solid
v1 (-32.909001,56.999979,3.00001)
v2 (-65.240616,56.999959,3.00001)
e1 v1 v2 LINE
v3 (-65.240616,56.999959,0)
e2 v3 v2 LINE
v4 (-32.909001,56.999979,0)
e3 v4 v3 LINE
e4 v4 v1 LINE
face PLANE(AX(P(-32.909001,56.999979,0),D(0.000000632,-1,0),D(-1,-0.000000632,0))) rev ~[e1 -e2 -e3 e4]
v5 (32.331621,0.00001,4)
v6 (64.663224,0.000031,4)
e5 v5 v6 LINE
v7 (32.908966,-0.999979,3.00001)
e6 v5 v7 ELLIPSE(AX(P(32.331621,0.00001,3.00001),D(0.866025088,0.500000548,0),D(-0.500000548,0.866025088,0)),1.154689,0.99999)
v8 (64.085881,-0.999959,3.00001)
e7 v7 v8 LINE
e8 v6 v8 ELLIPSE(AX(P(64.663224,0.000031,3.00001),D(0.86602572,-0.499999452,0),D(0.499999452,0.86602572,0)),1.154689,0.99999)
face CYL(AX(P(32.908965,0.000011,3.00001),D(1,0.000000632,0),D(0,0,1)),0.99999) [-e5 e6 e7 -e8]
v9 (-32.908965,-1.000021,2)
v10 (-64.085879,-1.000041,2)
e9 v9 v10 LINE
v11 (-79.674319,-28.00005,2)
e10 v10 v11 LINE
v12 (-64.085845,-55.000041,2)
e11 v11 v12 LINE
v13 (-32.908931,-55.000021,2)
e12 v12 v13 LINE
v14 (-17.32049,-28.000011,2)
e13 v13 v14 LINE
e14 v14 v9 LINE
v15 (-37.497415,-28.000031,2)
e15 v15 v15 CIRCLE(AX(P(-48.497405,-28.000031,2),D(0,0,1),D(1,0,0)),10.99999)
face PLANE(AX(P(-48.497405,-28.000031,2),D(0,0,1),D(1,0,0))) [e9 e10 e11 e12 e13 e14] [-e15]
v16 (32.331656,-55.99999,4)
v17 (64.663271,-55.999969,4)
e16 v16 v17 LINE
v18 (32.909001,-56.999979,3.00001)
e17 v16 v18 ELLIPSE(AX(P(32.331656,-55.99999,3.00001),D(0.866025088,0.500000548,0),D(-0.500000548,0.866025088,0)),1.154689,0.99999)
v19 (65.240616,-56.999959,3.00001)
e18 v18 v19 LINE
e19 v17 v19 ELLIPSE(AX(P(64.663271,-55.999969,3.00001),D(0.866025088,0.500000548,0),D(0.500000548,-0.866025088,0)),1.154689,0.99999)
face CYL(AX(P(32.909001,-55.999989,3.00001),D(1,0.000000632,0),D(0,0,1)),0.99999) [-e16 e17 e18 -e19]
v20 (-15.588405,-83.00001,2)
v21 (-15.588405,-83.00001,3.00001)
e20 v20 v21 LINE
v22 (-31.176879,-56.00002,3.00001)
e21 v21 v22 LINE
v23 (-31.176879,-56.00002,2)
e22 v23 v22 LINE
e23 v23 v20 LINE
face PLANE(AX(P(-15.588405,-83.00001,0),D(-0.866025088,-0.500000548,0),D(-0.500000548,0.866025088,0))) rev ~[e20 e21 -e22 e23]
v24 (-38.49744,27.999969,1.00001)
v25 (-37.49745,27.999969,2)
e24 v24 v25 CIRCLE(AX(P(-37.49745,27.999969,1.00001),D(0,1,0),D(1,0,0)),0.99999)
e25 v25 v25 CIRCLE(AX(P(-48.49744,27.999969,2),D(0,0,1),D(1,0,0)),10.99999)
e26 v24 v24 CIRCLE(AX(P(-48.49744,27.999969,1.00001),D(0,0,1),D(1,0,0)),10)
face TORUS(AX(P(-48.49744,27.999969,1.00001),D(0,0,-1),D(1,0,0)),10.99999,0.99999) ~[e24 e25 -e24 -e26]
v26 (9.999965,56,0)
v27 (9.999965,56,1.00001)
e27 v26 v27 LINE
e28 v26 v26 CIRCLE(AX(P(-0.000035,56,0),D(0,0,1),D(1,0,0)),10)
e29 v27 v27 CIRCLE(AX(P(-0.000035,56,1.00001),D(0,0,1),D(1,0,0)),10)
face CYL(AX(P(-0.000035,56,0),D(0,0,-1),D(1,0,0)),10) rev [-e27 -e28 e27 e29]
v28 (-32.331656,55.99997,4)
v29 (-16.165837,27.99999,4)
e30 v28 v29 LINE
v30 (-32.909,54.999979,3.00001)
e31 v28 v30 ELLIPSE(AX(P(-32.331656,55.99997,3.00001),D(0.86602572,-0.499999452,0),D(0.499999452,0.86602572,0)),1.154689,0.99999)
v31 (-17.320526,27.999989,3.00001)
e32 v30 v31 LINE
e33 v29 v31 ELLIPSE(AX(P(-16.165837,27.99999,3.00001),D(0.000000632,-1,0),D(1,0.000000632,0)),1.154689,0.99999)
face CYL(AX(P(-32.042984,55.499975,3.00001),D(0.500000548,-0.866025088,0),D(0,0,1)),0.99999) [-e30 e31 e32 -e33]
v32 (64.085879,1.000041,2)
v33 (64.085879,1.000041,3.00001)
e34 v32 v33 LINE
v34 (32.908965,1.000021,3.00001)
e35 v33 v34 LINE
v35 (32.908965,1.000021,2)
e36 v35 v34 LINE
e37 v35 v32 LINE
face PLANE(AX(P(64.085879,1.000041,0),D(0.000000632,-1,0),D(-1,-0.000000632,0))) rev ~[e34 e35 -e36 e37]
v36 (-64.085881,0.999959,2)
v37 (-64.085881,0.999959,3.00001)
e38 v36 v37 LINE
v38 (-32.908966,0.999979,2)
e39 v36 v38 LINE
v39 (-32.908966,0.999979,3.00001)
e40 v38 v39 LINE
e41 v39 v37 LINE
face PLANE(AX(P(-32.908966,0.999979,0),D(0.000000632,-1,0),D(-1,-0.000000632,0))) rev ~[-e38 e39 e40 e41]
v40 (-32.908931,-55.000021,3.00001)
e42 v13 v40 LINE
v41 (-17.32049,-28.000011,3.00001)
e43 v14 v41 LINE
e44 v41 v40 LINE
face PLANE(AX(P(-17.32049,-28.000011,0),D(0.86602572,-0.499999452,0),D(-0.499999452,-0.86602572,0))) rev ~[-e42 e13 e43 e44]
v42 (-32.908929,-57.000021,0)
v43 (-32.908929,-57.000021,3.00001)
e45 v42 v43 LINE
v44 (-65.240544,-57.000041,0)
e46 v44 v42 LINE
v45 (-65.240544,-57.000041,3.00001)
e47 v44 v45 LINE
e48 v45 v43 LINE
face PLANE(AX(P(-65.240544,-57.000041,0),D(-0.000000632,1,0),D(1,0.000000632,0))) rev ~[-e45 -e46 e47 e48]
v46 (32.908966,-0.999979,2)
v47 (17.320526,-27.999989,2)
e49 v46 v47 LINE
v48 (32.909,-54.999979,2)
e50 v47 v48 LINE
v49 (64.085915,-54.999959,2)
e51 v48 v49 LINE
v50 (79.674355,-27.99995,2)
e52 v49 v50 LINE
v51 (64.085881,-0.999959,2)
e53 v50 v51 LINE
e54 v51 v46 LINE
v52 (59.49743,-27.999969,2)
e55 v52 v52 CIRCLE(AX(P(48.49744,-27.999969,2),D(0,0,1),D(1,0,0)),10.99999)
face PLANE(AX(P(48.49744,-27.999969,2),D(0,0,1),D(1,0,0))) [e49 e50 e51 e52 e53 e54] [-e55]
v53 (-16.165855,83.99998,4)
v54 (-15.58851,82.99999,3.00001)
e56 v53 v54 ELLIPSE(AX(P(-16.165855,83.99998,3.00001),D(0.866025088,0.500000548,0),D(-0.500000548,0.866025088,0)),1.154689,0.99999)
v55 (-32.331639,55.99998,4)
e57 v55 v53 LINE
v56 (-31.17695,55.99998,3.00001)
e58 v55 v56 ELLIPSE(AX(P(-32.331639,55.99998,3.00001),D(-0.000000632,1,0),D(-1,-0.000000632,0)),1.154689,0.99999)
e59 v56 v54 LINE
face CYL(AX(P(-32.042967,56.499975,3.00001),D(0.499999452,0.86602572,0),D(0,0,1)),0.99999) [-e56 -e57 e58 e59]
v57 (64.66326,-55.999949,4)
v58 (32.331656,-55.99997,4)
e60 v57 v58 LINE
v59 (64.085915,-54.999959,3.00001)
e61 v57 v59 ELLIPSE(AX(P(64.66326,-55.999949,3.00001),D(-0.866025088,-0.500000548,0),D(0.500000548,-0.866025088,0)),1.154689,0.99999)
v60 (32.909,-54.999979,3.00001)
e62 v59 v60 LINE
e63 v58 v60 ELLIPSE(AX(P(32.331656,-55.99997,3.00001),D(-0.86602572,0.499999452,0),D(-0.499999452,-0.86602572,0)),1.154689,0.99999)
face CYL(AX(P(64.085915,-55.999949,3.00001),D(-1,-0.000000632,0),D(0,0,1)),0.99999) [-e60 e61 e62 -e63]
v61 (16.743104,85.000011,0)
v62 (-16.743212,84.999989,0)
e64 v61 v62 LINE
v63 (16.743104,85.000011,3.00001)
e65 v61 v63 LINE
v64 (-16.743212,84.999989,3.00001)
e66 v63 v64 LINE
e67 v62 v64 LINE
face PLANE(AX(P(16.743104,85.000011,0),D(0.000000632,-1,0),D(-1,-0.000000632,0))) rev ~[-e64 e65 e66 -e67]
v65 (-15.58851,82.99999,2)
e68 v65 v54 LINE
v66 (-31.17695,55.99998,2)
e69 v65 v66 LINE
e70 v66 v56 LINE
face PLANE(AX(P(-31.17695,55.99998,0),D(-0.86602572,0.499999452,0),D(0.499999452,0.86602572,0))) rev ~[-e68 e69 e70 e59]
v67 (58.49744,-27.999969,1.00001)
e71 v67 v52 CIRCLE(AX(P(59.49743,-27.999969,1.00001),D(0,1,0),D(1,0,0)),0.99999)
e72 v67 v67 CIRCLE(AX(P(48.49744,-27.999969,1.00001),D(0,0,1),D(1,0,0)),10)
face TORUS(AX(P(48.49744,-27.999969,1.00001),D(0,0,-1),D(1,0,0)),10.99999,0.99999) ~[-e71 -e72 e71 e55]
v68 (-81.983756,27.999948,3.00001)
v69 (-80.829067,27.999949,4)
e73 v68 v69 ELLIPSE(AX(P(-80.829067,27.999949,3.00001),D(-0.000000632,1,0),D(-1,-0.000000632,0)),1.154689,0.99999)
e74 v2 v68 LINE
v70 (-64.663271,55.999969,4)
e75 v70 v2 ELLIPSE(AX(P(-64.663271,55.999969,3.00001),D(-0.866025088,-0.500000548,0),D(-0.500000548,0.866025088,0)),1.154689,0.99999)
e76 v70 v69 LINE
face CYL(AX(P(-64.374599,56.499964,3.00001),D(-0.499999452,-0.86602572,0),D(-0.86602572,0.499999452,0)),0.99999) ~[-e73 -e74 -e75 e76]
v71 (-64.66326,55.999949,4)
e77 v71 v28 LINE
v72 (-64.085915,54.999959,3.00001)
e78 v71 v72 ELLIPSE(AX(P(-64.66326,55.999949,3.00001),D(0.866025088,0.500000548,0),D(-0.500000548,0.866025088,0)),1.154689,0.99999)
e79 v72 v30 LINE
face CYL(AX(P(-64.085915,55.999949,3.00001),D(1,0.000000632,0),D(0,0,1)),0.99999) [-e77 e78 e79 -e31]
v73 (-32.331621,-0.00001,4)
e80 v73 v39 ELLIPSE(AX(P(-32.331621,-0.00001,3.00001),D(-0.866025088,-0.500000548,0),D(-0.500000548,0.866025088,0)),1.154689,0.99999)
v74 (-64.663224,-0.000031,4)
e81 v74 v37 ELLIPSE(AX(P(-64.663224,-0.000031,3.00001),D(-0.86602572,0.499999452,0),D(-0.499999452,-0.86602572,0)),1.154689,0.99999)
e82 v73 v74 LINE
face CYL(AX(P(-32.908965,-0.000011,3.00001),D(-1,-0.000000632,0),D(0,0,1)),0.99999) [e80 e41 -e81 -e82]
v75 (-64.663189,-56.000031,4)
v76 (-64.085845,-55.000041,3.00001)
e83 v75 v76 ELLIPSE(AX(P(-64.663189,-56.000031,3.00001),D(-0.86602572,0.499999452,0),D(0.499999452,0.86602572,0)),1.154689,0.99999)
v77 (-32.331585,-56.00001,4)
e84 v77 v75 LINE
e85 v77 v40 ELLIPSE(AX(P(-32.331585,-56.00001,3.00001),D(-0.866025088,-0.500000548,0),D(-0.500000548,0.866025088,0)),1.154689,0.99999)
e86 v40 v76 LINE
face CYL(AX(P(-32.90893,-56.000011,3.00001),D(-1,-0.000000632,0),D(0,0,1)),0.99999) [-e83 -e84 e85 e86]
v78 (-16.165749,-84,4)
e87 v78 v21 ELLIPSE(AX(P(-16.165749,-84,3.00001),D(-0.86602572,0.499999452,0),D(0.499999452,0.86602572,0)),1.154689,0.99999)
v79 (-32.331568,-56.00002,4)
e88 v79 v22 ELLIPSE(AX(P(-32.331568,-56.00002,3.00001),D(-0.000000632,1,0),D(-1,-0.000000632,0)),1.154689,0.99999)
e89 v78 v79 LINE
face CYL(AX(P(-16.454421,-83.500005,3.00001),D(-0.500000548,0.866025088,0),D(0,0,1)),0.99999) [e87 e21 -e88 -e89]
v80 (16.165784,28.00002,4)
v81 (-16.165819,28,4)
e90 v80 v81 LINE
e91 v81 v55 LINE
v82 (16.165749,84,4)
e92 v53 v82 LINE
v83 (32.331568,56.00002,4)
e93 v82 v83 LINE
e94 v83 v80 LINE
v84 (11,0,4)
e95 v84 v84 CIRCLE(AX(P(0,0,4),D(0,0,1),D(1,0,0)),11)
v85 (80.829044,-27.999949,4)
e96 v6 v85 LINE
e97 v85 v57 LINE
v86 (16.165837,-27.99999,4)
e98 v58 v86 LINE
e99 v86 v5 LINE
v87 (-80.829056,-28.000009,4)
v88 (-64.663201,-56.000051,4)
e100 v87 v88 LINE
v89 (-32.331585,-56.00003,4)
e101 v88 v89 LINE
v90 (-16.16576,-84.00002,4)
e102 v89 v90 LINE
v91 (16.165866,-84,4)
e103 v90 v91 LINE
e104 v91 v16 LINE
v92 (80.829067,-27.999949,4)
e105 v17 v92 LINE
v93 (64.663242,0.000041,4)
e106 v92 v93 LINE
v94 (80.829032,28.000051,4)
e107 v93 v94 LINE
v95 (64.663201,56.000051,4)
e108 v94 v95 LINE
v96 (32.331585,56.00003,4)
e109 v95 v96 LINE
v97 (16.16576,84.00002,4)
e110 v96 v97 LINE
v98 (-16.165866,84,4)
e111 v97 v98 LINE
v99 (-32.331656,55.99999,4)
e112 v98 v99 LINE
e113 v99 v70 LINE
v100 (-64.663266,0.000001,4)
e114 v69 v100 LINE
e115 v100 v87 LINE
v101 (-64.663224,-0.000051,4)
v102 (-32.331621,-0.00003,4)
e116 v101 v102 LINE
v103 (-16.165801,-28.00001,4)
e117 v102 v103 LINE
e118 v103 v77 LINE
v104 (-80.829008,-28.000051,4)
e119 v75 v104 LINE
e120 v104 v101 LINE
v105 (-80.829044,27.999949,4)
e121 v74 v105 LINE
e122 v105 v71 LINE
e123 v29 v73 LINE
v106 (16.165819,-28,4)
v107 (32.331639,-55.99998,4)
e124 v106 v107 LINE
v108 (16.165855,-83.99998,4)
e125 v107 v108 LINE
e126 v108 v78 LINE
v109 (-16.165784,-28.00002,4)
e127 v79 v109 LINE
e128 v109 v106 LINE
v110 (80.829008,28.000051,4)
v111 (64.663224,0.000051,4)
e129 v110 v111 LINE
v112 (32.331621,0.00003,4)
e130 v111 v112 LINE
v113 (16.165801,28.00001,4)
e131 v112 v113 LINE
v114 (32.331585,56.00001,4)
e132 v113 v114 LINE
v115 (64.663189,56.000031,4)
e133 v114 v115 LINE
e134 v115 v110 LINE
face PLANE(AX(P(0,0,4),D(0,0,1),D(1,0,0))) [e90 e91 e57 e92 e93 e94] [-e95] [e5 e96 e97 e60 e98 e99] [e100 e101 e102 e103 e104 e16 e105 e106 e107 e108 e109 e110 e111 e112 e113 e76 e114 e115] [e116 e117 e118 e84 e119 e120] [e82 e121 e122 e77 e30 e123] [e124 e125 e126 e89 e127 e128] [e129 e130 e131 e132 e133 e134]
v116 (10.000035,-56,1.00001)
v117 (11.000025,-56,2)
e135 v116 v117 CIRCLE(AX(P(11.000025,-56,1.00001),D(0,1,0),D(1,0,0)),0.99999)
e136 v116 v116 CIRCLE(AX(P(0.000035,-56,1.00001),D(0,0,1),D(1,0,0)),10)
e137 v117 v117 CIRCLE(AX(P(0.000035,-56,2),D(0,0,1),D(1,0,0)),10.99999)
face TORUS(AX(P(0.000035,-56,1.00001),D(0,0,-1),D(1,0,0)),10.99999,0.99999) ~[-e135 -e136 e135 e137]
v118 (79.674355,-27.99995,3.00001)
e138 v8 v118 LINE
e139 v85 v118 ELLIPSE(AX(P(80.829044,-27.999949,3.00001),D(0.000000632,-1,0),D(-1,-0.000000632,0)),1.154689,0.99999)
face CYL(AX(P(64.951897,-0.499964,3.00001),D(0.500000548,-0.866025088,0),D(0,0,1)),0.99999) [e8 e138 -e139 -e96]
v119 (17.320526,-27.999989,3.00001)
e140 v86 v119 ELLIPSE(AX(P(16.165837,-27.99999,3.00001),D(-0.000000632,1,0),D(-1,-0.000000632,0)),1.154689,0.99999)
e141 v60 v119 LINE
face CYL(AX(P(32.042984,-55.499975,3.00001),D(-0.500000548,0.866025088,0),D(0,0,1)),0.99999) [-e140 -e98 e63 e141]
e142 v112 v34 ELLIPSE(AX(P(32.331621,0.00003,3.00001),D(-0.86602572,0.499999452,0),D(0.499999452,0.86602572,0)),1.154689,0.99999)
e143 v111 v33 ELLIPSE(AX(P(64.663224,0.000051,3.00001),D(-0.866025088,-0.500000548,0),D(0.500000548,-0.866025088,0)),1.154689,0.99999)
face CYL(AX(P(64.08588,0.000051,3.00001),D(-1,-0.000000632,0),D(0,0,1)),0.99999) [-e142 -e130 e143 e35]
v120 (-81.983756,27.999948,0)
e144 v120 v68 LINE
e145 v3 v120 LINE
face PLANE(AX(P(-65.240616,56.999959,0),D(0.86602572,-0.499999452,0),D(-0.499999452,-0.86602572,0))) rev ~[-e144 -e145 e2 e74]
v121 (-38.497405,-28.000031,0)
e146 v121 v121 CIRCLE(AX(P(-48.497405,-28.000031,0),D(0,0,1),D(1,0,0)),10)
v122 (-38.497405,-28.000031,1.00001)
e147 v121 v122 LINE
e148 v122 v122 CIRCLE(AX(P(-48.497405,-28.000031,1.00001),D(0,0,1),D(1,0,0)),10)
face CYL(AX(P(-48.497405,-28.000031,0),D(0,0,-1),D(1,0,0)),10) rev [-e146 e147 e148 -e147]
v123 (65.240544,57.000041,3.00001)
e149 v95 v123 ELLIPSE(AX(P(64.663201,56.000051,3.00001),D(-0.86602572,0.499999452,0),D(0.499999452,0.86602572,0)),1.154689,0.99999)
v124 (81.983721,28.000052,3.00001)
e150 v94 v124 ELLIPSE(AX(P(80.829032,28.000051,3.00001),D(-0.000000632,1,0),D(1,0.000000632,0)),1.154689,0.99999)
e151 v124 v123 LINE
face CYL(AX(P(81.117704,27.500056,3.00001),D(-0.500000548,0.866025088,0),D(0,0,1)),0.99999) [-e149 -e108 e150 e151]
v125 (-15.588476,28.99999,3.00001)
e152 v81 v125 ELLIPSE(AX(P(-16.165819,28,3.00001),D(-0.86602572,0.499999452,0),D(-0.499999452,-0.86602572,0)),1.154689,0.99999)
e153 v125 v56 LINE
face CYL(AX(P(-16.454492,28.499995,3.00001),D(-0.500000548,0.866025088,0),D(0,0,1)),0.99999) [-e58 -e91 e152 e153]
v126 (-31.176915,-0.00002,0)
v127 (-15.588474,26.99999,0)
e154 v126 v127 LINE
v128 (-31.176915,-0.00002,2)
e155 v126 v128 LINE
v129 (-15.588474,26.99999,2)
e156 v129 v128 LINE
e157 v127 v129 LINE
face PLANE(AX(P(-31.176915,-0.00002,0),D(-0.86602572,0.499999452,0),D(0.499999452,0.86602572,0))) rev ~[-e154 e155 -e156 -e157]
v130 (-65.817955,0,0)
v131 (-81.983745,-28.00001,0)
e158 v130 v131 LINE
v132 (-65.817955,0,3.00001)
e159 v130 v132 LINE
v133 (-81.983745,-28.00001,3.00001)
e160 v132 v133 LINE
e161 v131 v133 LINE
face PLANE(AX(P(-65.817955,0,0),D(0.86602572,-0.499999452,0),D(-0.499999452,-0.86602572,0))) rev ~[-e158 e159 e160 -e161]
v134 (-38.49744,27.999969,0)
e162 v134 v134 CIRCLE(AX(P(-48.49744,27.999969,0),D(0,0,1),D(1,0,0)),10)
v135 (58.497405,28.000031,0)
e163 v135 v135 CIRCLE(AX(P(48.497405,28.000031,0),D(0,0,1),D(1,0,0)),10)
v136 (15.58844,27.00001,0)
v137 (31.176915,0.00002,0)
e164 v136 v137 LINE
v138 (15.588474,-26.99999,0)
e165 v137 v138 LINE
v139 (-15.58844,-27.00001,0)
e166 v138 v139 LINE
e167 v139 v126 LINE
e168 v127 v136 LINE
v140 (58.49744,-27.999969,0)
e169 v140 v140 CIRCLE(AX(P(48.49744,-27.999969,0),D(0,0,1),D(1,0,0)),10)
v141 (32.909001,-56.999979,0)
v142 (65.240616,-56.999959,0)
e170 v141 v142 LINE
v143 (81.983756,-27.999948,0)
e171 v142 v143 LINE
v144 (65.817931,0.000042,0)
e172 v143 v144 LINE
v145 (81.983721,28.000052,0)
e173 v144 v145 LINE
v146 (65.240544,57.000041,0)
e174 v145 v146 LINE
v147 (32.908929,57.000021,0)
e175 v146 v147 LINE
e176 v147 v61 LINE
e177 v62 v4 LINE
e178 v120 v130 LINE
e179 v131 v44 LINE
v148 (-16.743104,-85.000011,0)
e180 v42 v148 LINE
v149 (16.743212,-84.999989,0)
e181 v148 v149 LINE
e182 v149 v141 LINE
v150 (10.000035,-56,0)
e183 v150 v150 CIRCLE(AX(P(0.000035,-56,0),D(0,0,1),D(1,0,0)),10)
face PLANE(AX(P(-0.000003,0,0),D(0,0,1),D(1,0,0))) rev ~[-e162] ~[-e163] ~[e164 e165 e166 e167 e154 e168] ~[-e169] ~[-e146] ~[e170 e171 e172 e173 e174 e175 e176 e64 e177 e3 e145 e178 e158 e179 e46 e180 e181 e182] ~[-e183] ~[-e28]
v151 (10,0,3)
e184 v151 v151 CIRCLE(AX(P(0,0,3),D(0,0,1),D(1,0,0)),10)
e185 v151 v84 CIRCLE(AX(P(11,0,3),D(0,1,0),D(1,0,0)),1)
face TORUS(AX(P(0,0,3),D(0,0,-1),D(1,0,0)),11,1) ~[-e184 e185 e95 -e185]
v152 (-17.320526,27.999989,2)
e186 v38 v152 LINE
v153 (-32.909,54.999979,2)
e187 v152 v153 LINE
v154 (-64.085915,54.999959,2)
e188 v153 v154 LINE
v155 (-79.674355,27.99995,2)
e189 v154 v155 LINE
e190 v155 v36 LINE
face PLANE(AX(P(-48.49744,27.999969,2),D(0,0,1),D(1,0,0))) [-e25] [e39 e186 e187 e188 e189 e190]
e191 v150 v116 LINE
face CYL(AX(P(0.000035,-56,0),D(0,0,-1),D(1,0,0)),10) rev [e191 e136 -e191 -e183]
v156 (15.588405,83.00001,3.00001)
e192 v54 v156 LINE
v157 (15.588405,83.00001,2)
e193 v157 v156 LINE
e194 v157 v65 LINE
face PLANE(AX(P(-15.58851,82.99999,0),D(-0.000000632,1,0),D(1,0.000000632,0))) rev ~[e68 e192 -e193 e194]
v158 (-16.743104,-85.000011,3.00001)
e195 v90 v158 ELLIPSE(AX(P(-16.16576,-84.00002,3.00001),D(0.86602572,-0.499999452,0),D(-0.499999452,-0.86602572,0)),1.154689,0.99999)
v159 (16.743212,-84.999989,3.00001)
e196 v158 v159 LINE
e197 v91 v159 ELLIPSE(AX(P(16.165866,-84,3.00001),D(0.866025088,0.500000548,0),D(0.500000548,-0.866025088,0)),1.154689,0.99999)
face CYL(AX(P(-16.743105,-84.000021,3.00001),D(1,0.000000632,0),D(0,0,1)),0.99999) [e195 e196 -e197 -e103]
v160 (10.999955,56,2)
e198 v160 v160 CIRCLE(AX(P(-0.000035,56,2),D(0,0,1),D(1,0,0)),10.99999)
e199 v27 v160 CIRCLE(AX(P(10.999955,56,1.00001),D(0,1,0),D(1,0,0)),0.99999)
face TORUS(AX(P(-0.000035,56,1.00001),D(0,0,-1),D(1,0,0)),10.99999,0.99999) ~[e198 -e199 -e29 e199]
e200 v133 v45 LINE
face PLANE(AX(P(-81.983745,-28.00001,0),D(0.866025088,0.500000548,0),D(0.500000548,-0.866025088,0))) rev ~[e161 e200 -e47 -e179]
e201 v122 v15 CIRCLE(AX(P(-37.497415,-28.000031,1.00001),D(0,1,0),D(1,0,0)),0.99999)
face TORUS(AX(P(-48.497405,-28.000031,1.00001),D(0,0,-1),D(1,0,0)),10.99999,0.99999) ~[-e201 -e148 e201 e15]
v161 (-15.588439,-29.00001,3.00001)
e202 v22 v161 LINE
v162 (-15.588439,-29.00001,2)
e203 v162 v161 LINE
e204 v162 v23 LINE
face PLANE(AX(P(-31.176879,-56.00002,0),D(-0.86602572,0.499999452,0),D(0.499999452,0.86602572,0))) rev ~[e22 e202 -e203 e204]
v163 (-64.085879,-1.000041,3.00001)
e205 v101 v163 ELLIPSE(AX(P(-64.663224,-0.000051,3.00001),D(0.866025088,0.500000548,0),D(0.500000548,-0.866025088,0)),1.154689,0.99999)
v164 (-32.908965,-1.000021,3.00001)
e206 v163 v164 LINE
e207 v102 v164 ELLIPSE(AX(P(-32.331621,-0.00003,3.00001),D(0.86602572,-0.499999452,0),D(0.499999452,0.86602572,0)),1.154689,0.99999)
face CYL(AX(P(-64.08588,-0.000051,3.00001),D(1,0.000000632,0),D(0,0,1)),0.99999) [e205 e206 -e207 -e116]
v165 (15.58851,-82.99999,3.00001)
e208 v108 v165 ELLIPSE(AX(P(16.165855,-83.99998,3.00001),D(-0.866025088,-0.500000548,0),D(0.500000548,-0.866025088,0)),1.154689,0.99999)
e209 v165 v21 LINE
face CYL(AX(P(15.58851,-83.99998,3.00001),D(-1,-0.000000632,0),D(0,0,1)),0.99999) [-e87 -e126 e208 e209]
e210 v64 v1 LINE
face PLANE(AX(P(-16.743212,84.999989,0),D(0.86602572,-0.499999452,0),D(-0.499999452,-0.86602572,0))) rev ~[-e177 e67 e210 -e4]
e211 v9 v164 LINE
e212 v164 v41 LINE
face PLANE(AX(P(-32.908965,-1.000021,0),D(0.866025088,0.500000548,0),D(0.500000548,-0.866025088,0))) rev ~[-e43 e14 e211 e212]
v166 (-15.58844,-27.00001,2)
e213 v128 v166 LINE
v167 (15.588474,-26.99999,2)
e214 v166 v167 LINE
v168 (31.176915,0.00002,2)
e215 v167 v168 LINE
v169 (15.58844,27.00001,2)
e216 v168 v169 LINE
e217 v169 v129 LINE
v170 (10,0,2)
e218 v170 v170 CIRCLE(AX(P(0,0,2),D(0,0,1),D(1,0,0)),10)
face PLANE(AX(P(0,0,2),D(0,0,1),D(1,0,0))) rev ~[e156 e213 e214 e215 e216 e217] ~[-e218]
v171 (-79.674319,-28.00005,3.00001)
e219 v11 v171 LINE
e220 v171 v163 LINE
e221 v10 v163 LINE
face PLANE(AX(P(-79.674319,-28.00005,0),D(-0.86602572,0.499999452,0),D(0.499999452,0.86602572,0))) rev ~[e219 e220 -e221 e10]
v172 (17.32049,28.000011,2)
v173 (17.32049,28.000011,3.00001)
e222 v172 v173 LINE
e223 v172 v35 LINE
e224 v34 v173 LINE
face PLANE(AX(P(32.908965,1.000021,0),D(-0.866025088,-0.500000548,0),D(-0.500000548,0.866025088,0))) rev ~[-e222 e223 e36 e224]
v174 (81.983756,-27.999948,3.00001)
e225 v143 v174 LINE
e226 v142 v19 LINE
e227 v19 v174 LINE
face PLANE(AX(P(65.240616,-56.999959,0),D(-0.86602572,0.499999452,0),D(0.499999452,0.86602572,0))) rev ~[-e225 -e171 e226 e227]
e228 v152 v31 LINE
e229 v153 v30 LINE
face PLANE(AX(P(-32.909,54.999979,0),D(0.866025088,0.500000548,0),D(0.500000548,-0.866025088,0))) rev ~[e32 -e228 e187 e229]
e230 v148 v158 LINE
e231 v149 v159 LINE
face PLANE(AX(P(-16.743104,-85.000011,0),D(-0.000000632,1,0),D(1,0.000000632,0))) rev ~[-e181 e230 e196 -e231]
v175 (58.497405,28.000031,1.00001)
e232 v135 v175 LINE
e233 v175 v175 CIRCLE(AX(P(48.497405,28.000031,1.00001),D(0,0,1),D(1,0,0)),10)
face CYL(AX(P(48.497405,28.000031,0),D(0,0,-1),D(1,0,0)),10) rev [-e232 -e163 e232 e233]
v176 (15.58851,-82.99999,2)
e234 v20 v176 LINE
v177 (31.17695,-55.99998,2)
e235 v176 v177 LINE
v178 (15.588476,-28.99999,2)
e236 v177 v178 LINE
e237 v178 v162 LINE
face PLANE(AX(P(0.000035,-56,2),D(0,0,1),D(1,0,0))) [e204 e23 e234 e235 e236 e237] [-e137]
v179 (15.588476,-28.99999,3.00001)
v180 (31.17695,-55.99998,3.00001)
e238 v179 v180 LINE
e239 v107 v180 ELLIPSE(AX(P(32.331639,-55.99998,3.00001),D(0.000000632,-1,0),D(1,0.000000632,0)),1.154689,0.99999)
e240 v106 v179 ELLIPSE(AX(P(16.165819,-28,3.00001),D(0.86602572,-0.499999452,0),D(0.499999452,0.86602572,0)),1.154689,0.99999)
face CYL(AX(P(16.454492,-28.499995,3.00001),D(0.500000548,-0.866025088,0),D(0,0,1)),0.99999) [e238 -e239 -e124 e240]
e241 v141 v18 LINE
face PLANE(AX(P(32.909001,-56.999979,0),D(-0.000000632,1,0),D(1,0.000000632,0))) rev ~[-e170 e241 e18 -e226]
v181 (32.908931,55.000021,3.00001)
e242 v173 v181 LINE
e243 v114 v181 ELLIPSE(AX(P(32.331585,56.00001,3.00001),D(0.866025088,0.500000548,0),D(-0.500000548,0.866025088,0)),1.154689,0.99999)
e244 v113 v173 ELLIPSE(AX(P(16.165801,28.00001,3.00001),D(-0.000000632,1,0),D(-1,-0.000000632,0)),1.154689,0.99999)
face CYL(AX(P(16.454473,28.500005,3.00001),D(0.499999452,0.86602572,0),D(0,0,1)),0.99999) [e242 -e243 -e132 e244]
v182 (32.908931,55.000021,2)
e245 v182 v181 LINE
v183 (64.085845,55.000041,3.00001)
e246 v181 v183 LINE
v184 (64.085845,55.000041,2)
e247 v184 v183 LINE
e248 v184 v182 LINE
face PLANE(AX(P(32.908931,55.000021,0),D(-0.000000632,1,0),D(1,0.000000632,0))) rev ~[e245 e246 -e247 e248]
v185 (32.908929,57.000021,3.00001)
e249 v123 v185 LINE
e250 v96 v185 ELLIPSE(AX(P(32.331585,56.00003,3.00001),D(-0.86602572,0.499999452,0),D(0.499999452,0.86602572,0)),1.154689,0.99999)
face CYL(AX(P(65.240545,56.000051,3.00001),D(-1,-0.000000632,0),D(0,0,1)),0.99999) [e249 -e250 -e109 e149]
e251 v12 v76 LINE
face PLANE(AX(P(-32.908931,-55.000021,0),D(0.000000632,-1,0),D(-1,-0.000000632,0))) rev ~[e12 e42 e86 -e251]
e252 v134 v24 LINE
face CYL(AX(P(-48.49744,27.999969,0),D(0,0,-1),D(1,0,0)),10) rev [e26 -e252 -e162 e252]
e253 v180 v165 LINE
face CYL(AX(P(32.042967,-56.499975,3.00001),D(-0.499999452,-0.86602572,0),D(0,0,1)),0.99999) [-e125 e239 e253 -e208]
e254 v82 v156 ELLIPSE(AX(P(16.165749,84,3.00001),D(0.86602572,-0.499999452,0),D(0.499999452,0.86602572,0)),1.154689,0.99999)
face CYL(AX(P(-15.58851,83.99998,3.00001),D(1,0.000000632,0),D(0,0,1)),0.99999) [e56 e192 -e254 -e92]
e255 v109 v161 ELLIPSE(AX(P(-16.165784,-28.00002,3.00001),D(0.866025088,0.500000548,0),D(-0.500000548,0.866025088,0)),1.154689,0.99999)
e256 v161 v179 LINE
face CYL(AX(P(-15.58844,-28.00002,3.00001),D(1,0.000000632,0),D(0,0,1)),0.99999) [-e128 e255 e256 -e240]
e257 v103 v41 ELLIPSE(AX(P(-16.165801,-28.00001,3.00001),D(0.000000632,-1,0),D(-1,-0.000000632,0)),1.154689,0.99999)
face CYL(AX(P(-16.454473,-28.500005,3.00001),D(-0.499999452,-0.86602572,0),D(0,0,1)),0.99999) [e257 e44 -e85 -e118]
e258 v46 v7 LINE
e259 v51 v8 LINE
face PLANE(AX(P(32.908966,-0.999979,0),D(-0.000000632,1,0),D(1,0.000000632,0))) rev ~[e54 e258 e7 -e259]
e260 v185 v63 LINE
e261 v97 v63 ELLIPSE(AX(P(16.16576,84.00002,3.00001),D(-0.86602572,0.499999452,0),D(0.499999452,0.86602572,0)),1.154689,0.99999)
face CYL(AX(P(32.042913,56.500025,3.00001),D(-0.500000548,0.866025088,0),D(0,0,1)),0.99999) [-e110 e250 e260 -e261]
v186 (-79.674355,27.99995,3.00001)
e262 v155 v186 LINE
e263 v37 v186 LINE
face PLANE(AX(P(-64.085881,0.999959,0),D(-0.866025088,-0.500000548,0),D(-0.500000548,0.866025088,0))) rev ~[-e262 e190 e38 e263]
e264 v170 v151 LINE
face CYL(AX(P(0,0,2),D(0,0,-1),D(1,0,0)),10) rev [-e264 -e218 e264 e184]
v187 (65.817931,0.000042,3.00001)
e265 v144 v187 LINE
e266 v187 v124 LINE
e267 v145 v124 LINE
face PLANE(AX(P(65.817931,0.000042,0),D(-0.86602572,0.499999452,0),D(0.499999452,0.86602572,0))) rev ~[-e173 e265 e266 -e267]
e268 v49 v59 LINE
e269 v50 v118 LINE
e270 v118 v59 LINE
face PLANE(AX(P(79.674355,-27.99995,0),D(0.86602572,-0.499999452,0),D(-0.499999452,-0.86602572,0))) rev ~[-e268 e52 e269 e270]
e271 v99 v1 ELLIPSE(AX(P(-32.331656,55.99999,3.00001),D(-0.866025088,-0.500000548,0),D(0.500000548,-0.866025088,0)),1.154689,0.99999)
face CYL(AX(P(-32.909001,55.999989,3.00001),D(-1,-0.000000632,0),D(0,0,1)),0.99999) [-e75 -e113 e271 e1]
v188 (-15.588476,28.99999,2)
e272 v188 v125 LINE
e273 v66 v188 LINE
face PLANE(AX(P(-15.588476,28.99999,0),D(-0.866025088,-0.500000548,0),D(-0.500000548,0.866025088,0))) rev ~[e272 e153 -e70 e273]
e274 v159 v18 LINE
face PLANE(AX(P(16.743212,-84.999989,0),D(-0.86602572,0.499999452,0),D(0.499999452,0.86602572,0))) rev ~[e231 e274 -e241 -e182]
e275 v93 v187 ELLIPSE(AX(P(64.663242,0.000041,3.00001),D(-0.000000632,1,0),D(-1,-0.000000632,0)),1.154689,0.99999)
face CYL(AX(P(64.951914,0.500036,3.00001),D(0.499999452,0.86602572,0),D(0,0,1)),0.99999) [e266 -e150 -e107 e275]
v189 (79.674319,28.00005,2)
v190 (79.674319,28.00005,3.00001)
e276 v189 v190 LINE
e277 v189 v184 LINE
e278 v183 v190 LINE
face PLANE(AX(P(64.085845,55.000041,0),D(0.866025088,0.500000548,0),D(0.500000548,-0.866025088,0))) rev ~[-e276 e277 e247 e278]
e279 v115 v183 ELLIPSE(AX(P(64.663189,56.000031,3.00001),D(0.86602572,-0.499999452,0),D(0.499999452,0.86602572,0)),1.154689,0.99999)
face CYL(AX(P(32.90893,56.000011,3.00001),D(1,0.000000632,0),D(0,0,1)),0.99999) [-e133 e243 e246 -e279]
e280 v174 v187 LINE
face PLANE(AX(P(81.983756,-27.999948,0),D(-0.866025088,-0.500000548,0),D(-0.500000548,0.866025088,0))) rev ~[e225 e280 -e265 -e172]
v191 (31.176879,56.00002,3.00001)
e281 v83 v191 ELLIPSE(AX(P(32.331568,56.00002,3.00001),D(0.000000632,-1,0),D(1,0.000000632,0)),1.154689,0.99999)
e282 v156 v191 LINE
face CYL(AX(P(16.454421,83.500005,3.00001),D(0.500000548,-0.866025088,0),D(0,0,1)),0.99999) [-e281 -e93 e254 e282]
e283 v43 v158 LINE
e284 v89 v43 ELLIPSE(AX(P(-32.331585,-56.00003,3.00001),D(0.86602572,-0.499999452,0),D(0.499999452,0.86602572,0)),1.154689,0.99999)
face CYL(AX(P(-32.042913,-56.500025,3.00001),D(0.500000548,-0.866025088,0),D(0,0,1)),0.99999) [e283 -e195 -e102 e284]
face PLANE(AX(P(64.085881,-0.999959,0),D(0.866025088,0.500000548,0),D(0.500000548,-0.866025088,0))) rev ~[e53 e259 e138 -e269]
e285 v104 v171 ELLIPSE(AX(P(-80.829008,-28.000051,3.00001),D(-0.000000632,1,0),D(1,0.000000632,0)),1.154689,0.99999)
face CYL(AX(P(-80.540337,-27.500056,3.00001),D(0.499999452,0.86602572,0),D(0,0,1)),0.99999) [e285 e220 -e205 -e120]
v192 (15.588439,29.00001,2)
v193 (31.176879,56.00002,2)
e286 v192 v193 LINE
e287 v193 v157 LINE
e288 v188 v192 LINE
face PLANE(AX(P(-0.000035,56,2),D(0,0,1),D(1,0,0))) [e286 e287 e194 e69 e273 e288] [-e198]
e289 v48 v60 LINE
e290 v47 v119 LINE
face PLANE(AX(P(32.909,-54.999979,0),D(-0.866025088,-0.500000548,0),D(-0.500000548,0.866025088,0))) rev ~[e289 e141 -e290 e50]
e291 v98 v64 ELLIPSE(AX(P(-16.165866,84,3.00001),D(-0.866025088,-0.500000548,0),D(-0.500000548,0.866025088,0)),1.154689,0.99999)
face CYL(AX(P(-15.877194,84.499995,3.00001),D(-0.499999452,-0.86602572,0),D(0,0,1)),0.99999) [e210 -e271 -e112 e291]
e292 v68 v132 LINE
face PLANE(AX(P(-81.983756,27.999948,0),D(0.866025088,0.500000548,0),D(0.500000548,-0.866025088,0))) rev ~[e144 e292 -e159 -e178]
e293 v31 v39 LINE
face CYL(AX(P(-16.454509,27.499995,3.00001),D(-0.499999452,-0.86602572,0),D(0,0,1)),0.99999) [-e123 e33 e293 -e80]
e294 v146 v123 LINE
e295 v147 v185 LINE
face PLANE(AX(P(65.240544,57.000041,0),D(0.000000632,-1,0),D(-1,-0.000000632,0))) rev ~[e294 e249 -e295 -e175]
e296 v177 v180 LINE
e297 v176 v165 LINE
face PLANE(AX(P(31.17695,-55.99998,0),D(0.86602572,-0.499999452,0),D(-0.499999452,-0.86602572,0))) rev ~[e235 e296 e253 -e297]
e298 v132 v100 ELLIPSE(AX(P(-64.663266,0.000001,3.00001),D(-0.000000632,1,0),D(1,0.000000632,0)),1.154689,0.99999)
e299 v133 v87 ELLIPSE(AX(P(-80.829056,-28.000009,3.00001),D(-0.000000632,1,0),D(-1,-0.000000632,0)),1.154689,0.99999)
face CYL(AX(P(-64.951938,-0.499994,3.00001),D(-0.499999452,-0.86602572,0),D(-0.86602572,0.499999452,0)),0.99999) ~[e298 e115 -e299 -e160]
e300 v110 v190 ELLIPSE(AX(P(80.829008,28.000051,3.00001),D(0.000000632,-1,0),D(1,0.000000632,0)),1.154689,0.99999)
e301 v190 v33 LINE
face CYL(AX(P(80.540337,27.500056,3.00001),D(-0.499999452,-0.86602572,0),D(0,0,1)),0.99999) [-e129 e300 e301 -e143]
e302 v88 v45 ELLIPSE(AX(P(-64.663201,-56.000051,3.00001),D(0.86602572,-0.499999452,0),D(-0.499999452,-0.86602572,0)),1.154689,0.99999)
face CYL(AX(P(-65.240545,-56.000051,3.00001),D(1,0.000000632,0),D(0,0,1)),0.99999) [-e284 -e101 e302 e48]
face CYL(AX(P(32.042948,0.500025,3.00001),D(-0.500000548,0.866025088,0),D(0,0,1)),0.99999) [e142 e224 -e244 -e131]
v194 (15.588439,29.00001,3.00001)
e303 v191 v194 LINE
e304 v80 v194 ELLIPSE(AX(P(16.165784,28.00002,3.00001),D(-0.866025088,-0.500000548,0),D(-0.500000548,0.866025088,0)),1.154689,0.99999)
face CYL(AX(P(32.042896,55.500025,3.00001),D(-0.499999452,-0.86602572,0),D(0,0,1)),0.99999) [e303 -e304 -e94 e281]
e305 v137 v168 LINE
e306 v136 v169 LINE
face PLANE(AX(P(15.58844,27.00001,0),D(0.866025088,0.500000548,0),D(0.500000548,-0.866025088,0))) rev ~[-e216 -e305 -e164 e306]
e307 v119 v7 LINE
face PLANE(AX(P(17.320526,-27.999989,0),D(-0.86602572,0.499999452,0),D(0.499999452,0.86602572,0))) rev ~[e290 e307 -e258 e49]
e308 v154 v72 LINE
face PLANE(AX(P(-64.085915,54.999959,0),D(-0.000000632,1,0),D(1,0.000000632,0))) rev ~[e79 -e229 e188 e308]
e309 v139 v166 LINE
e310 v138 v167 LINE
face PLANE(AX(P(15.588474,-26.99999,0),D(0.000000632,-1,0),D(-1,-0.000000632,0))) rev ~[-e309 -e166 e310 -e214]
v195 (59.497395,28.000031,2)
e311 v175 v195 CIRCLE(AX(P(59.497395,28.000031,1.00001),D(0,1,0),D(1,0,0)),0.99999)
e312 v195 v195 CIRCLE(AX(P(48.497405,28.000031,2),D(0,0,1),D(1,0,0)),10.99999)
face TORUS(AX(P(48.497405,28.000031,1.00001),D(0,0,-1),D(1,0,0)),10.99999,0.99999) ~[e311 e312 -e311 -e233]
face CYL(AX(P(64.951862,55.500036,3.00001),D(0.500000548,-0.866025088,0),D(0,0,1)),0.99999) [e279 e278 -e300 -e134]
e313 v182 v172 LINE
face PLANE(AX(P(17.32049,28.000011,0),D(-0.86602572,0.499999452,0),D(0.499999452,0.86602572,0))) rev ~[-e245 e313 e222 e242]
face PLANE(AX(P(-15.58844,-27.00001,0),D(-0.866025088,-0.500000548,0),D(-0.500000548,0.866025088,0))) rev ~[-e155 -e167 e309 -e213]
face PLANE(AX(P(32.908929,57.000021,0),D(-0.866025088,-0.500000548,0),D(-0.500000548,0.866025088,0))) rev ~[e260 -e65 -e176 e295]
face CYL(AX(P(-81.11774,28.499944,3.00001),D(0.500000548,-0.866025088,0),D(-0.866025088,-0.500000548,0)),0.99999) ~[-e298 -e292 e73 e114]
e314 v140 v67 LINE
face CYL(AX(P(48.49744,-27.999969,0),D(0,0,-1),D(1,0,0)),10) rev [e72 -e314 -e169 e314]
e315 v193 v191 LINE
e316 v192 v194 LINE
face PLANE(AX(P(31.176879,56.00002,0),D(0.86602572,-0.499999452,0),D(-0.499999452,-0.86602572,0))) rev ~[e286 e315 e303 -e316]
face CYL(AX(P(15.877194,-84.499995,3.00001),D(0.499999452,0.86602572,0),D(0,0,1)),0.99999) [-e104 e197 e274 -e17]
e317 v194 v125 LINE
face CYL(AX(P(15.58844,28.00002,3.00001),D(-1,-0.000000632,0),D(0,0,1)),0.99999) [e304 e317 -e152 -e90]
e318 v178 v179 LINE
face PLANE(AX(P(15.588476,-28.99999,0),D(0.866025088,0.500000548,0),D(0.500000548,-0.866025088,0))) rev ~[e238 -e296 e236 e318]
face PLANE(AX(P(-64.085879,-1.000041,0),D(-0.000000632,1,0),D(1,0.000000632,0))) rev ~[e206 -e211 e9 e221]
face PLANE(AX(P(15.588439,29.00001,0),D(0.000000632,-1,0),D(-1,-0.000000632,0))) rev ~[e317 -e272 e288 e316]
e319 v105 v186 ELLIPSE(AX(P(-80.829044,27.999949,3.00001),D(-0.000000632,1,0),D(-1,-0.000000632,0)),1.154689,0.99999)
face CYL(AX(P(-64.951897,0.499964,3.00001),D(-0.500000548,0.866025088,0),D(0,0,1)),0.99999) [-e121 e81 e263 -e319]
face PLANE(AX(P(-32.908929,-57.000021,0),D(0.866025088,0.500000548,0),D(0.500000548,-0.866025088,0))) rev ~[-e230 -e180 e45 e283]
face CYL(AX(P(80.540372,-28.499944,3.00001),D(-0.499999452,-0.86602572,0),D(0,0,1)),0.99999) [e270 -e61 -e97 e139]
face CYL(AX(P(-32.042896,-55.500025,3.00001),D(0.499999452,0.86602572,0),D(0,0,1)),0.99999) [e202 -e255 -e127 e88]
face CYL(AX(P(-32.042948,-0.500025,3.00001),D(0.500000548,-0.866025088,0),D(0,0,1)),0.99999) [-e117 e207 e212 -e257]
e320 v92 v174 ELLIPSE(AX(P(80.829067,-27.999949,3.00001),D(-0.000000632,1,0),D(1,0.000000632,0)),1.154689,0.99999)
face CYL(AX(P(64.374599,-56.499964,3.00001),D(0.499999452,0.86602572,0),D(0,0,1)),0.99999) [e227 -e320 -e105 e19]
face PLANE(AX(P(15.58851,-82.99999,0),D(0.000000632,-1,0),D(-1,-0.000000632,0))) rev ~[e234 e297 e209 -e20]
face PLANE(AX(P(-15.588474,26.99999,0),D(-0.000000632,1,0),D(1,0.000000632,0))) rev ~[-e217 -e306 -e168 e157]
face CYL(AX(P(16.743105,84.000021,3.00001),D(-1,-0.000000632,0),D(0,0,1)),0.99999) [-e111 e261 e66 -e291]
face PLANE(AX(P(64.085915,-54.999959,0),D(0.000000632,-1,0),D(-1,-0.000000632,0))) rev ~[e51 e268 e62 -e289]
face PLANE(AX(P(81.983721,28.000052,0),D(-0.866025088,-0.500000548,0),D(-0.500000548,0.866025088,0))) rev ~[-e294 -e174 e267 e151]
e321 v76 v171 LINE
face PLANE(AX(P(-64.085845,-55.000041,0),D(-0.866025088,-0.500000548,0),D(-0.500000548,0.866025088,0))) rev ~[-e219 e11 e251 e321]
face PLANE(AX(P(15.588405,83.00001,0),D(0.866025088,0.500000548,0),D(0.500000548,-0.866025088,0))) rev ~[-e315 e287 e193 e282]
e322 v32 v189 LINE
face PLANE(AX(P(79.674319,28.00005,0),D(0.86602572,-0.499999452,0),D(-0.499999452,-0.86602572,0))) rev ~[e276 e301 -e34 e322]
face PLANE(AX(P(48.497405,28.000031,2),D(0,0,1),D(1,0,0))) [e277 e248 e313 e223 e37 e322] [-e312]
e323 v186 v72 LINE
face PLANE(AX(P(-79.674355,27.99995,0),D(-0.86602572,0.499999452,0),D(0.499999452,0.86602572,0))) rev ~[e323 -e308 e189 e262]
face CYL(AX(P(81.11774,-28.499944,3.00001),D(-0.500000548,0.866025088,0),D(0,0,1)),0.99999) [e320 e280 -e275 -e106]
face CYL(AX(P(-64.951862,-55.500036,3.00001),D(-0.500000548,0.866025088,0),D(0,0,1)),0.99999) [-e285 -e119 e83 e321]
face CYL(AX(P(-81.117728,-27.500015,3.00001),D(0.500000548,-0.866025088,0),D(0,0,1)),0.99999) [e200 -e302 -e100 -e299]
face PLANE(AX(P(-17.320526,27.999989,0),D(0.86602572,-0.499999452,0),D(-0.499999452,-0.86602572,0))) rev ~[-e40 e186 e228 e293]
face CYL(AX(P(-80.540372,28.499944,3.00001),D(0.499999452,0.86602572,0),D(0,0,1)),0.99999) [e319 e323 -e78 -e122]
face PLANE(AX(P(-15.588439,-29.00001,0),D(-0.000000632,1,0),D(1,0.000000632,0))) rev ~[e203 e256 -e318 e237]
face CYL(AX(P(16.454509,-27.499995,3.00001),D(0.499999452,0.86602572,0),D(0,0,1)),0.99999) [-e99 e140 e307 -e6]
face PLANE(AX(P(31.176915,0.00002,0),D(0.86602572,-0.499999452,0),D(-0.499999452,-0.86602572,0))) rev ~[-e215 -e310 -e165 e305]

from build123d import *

# Parameters (mm, degrees)
F0_R     = 10
F1_DEPTH = 2
F2_DEPTH = 4
F3_R     = 0.99999
F4_START = 2
F4_DEPTH = 2
F5_R     = 1


# Not quite as in the source:
# - two fillets or chamfers of one size are made in one step
# - a fillet or chamfer is up to 0.001 mm smaller than in the source, because OpenCascade refuses the exact size


with BuildPart() as f1:
    # F0 (on Top) → F1 (new body)
    with BuildSketch(Plane.XY):
        Polygon((-64.0859146607, 54.9999594737), (-79.6743548546, 27.999949616), (-64.0858805124, 0.9999594737), (-32.9089659762, 0.9999791892), (-17.3205257822, 27.9999890469), (-32.9090001244, 54.9999791892), align=None)
        with Locations((-48.4974403184, 27.9999693314)):
            Circle(F0_R, mode=Mode.SUBTRACT)
    extrude(amount=F1_DEPTH)



with BuildPart() as f1b:
    # F0 (on Top) → F1, piece 2 (new body)
    with BuildSketch(Plane.XY):
        Polygon((-15.5885097552, 82.9999901422), (-31.1769499492, 55.9999802845), (-15.588475607, 28.9999901422), (15.5884389292, 29.0000098577), (31.1768791232, 56.0000197155), (15.588404781, 83.0000098577), align=None)
        with Locations((-3.5413e-05, 56)):
            Circle(F0_R, mode=Mode.SUBTRACT)
    extrude(amount=F1_DEPTH)


with BuildPart() as f1c:
    # F0 (on Top) → F1, piece 3 (new body)
    with BuildSketch(Plane.XY):
        Polygon((32.9089305632, 55.0000208108), (17.3204903692, 28.000010953), (32.9089647114, 1.0000208108), (64.0858792477, 1.0000405263), (79.6743194417, 28.000050384), (64.0858450994, 55.0000405263), align=None)
        with Locations((48.4974049054, 28.0000306685)):
            Circle(F0_R, mode=Mode.SUBTRACT)
    extrude(amount=F1_DEPTH)


with BuildPart() as f1d:
    # F0 (on Top) → F1, piece 4 (new body)
    with BuildSketch(Plane.XY):
        Polygon((32.9089659762, -0.9999791892), (17.3205257822, -27.9999890469), (32.9090001244, -54.9999791892), (64.0859146607, -54.9999594737), (79.6743548546, -27.999949616), (64.0858805124, -0.9999594737), align=None)
        with Locations((48.4974403184, -27.9999693314)):
            Circle(F0_R, mode=Mode.SUBTRACT)
    extrude(amount=F1_DEPTH)


with BuildPart() as f1e:
    # F0 (on Top) → F1, piece 5 (new body)
    with BuildSketch(Plane.XY):
        Polygon((-15.5884389292, -29.0000098577), (-31.1768791232, -56.0000197155), (-15.588404781, -83.0000098577), (15.5885097552, -82.9999901422), (31.1769499492, -55.9999802845), (15.588475607, -28.9999901422), align=None)
        with Locations((3.5413e-05, -56)):
            Circle(F0_R, mode=Mode.SUBTRACT)
    extrude(amount=F1_DEPTH)


with BuildPart() as f1f:
    # F0 (on Top) → F1, piece 6 (new body)
    with BuildSketch(Plane.XY):
        Polygon((-64.0858792477, -1.0000405263), (-79.6743194417, -28.000050384), (-64.0858450994, -55.0000405263), (-32.9089305632, -55.0000208108), (-17.3204903692, -28.000010953), (-32.9089647114, -1.0000208108), align=None)
        with Locations((-48.4974049054, -28.0000306685)):
            Circle(F0_R, mode=Mode.SUBTRACT)
    extrude(amount=F1_DEPTH)


with BuildPart() as f1_1:
    add(f1.part)

    add(f1b.part)  # F2 merges F1b

    add(f1c.part)  # F2 merges F1c

    add(f1d.part)  # F2 merges F1d

    add(f1e.part)  # F2 merges F1e

    add(f1f.part)  # F2 merges F1f
    # F0 (on Top) → F2 (join)
    with BuildSketch(Plane.XY):
        Polygon((-81.9837559314, 27.9999481555), (-65.8179547179, 0), (-81.9837445487, -28.0000102228), (-65.2405443731, -57.0000412565), (-32.9089292984, -57.0000208108), (-16.7431040546, -85.0000105879), (16.7432115584, -84.999989412), (32.9090013892, -56.9999791892), (65.2406164638, -56.9999587435), (81.9837559314, -27.9999481555), (65.8179306876, 4.16216e-05), (81.9837205184, 28.0000518444), (65.2405443731, 57.0000412565), (32.9089292984, 57.0000208108), (16.7431040546, 85.0000105879), (-16.7432115584, 84.999989412), (-32.9090013892, 56.9999791892), (-65.2406164638, 56.9999587435), align=None)
        Polygon((-64.0858450994, -55.0000405263), (-79.6743194417, -28.000050384), (-64.0858792477, -1.0000405263), (-32.9089647114, -1.0000208108), (-17.3204903692, -28.000010953), (-32.9089305632, -55.0000208108), align=None, mode=Mode.SUBTRACT)
        Polygon((-15.5884743422, 26.9999901422), (15.588440194, 27.0000098577), (31.1769145362, 1.97155e-05), (15.5884743422, -26.9999901422), (-15.588440194, -27.0000098577), (-31.1769145362, -1.97155e-05), align=None, mode=Mode.SUBTRACT)
        Polygon((-15.588404781, -83.0000098577), (-31.1768791232, -56.0000197155), (-15.5884389292, -29.0000098577), (15.588475607, -28.9999901422), (31.1769499492, -55.9999802845), (15.5885097552, -82.9999901422), align=None, mode=Mode.SUBTRACT)
        Polygon((32.9090001244, -54.9999791892), (17.3205257822, -27.9999890469), (32.9089659762, -0.9999791892), (64.0858805124, -0.9999594737), (79.6743548546, -27.999949616), (64.0859146607, -54.9999594737), align=None, mode=Mode.SUBTRACT)
        Polygon((-64.0858805124, 0.9999594737), (-79.6743548546, 27.999949616), (-64.0859146607, 54.9999594737), (-32.9090001244, 54.9999791892), (-17.3205257822, 27.9999890469), (-32.9089659762, 0.9999791892), align=None, mode=Mode.SUBTRACT)
        Polygon((-15.588475607, 28.9999901422), (-31.1769499492, 55.9999802845), (-15.5885097552, 82.9999901422), (15.588404781, 83.0000098577), (31.1768791232, 56.0000197155), (15.5884389292, 29.0000098577), align=None, mode=Mode.SUBTRACT)
        Polygon((32.9089647114, 1.0000208108), (17.3204903692, 28.000010953), (32.9089305632, 55.0000208108), (64.0858450994, 55.0000405263), (79.6743194417, 28.000050384), (64.0858792477, 1.0000405263), align=None, mode=Mode.SUBTRACT)
    extrude(amount=F2_DEPTH)

    # F3 (radius 1 in the source; OpenCascade refuses exactly that, so slightly less here)
    f3_edges = [f1_1.edges().sort_by_distance(p)[0] for p in [
        (-9.999965, -56, 2),
        (-58.497405, -28.000031, 2),
        (-58.49744, 27.999969, 2),
        (-10.000035, 56, 2),
        (38.497405, 28.000031, 2),
        (38.49744, -27.999969, 2),
        (-48.497422, -1.000031, 4),
        (-71.880099, -14.500045, 4),
        (-71.880082, -41.500045, 4),
        (-48.497388, -55.000031, 4),
        (-25.11471, -41.500016, 4),
        (-25.114728, -14.500016, 4),
        (24.826017, 71.000016, 4),
        (-5.4e-05, 85, 4),
        (-24.826106, 70.999984, 4),
        (-49.074809, 56.999969, 4),
        (-73.612186, 42.499953, 4),
        (-73.900855, 13.999974, 4),
        (-73.90085, -14.000005, 4),
        (-73.612144, -42.500026, 4),
        (-49.074737, -57.000031, 4),
        (-24.826017, -71.000016, 4),
        (5.4e-05, -85, 4),
        (24.826106, -70.999984, 4),
        (49.074809, -56.999969, 4),
        (73.612186, -42.499953, 4),
        (73.900843, -13.999953, 4),
        (73.900826, 14.000047, 4),
        (73.612132, 42.500047, 4),
        (49.074737, 57.000031, 4),
        (-23.382642, -69.500015, 4),
        (-23.382659, -42.500015, 4),
        (1.8e-05, -29, 4),
        (23.382713, -42.499985, 4),
        (23.38273, -69.499985, 4),
        (5.2e-05, -83, 4),
        (71.880135, -41.499955, 4),
        (48.497457, -54.999969, 4),
        (25.114763, -41.499984, 4),
        (25.114746, -14.499984, 4),
        (48.497423, -0.999969, 4),
        (71.880118, -14.499955, 4),
        (-48.497423, 0.999969, 4),
        (-71.880118, 14.499955, 4),
        (-71.880135, 41.499955, 4),
        (-48.497457, 54.999969, 4),
        (-25.114763, 41.499984, 4),
        (-25.114746, 14.499984, 4),
        (-1.8e-05, 29, 4),
        (-23.382713, 42.499985, 4),
        (-23.38273, 69.499985, 4),
        (-5.2e-05, 83, 4),
        (23.382642, 69.500015, 4),
        (23.382659, 42.500015, 4),
        (25.114728, 14.500016, 4),
        (25.11471, 41.500016, 4),
        (48.497388, 55.000031, 4),
        (71.880082, 41.500045, 4),
        (71.880099, 14.500045, 4),
        (48.497422, 1.000031, 4),
    ]]
    fillet(f3_edges, radius=F3_R)

    # F0 (on Top) → F4 (join)
    with BuildSketch(Plane.XY.offset(F4_START)):
        Polygon((31.1769145362, 1.97155e-05), (15.588440194, 27.0000098577), (-15.5884743422, 26.9999901422), (-31.1769145362, -1.97155e-05), (-15.588440194, -27.0000098577), (15.5884743422, -26.9999901422), align=None)
        Circle(F0_R, mode=Mode.SUBTRACT)
    extrude(amount=F4_DEPTH)

    # F5
    f5_edges = [f1_1.edges().sort_by_distance(p)[0] for p in [
        (-10, 0, 4),
    ]]
    fillet(f5_edges, radius=F5_R)


solid = f1_1.part
